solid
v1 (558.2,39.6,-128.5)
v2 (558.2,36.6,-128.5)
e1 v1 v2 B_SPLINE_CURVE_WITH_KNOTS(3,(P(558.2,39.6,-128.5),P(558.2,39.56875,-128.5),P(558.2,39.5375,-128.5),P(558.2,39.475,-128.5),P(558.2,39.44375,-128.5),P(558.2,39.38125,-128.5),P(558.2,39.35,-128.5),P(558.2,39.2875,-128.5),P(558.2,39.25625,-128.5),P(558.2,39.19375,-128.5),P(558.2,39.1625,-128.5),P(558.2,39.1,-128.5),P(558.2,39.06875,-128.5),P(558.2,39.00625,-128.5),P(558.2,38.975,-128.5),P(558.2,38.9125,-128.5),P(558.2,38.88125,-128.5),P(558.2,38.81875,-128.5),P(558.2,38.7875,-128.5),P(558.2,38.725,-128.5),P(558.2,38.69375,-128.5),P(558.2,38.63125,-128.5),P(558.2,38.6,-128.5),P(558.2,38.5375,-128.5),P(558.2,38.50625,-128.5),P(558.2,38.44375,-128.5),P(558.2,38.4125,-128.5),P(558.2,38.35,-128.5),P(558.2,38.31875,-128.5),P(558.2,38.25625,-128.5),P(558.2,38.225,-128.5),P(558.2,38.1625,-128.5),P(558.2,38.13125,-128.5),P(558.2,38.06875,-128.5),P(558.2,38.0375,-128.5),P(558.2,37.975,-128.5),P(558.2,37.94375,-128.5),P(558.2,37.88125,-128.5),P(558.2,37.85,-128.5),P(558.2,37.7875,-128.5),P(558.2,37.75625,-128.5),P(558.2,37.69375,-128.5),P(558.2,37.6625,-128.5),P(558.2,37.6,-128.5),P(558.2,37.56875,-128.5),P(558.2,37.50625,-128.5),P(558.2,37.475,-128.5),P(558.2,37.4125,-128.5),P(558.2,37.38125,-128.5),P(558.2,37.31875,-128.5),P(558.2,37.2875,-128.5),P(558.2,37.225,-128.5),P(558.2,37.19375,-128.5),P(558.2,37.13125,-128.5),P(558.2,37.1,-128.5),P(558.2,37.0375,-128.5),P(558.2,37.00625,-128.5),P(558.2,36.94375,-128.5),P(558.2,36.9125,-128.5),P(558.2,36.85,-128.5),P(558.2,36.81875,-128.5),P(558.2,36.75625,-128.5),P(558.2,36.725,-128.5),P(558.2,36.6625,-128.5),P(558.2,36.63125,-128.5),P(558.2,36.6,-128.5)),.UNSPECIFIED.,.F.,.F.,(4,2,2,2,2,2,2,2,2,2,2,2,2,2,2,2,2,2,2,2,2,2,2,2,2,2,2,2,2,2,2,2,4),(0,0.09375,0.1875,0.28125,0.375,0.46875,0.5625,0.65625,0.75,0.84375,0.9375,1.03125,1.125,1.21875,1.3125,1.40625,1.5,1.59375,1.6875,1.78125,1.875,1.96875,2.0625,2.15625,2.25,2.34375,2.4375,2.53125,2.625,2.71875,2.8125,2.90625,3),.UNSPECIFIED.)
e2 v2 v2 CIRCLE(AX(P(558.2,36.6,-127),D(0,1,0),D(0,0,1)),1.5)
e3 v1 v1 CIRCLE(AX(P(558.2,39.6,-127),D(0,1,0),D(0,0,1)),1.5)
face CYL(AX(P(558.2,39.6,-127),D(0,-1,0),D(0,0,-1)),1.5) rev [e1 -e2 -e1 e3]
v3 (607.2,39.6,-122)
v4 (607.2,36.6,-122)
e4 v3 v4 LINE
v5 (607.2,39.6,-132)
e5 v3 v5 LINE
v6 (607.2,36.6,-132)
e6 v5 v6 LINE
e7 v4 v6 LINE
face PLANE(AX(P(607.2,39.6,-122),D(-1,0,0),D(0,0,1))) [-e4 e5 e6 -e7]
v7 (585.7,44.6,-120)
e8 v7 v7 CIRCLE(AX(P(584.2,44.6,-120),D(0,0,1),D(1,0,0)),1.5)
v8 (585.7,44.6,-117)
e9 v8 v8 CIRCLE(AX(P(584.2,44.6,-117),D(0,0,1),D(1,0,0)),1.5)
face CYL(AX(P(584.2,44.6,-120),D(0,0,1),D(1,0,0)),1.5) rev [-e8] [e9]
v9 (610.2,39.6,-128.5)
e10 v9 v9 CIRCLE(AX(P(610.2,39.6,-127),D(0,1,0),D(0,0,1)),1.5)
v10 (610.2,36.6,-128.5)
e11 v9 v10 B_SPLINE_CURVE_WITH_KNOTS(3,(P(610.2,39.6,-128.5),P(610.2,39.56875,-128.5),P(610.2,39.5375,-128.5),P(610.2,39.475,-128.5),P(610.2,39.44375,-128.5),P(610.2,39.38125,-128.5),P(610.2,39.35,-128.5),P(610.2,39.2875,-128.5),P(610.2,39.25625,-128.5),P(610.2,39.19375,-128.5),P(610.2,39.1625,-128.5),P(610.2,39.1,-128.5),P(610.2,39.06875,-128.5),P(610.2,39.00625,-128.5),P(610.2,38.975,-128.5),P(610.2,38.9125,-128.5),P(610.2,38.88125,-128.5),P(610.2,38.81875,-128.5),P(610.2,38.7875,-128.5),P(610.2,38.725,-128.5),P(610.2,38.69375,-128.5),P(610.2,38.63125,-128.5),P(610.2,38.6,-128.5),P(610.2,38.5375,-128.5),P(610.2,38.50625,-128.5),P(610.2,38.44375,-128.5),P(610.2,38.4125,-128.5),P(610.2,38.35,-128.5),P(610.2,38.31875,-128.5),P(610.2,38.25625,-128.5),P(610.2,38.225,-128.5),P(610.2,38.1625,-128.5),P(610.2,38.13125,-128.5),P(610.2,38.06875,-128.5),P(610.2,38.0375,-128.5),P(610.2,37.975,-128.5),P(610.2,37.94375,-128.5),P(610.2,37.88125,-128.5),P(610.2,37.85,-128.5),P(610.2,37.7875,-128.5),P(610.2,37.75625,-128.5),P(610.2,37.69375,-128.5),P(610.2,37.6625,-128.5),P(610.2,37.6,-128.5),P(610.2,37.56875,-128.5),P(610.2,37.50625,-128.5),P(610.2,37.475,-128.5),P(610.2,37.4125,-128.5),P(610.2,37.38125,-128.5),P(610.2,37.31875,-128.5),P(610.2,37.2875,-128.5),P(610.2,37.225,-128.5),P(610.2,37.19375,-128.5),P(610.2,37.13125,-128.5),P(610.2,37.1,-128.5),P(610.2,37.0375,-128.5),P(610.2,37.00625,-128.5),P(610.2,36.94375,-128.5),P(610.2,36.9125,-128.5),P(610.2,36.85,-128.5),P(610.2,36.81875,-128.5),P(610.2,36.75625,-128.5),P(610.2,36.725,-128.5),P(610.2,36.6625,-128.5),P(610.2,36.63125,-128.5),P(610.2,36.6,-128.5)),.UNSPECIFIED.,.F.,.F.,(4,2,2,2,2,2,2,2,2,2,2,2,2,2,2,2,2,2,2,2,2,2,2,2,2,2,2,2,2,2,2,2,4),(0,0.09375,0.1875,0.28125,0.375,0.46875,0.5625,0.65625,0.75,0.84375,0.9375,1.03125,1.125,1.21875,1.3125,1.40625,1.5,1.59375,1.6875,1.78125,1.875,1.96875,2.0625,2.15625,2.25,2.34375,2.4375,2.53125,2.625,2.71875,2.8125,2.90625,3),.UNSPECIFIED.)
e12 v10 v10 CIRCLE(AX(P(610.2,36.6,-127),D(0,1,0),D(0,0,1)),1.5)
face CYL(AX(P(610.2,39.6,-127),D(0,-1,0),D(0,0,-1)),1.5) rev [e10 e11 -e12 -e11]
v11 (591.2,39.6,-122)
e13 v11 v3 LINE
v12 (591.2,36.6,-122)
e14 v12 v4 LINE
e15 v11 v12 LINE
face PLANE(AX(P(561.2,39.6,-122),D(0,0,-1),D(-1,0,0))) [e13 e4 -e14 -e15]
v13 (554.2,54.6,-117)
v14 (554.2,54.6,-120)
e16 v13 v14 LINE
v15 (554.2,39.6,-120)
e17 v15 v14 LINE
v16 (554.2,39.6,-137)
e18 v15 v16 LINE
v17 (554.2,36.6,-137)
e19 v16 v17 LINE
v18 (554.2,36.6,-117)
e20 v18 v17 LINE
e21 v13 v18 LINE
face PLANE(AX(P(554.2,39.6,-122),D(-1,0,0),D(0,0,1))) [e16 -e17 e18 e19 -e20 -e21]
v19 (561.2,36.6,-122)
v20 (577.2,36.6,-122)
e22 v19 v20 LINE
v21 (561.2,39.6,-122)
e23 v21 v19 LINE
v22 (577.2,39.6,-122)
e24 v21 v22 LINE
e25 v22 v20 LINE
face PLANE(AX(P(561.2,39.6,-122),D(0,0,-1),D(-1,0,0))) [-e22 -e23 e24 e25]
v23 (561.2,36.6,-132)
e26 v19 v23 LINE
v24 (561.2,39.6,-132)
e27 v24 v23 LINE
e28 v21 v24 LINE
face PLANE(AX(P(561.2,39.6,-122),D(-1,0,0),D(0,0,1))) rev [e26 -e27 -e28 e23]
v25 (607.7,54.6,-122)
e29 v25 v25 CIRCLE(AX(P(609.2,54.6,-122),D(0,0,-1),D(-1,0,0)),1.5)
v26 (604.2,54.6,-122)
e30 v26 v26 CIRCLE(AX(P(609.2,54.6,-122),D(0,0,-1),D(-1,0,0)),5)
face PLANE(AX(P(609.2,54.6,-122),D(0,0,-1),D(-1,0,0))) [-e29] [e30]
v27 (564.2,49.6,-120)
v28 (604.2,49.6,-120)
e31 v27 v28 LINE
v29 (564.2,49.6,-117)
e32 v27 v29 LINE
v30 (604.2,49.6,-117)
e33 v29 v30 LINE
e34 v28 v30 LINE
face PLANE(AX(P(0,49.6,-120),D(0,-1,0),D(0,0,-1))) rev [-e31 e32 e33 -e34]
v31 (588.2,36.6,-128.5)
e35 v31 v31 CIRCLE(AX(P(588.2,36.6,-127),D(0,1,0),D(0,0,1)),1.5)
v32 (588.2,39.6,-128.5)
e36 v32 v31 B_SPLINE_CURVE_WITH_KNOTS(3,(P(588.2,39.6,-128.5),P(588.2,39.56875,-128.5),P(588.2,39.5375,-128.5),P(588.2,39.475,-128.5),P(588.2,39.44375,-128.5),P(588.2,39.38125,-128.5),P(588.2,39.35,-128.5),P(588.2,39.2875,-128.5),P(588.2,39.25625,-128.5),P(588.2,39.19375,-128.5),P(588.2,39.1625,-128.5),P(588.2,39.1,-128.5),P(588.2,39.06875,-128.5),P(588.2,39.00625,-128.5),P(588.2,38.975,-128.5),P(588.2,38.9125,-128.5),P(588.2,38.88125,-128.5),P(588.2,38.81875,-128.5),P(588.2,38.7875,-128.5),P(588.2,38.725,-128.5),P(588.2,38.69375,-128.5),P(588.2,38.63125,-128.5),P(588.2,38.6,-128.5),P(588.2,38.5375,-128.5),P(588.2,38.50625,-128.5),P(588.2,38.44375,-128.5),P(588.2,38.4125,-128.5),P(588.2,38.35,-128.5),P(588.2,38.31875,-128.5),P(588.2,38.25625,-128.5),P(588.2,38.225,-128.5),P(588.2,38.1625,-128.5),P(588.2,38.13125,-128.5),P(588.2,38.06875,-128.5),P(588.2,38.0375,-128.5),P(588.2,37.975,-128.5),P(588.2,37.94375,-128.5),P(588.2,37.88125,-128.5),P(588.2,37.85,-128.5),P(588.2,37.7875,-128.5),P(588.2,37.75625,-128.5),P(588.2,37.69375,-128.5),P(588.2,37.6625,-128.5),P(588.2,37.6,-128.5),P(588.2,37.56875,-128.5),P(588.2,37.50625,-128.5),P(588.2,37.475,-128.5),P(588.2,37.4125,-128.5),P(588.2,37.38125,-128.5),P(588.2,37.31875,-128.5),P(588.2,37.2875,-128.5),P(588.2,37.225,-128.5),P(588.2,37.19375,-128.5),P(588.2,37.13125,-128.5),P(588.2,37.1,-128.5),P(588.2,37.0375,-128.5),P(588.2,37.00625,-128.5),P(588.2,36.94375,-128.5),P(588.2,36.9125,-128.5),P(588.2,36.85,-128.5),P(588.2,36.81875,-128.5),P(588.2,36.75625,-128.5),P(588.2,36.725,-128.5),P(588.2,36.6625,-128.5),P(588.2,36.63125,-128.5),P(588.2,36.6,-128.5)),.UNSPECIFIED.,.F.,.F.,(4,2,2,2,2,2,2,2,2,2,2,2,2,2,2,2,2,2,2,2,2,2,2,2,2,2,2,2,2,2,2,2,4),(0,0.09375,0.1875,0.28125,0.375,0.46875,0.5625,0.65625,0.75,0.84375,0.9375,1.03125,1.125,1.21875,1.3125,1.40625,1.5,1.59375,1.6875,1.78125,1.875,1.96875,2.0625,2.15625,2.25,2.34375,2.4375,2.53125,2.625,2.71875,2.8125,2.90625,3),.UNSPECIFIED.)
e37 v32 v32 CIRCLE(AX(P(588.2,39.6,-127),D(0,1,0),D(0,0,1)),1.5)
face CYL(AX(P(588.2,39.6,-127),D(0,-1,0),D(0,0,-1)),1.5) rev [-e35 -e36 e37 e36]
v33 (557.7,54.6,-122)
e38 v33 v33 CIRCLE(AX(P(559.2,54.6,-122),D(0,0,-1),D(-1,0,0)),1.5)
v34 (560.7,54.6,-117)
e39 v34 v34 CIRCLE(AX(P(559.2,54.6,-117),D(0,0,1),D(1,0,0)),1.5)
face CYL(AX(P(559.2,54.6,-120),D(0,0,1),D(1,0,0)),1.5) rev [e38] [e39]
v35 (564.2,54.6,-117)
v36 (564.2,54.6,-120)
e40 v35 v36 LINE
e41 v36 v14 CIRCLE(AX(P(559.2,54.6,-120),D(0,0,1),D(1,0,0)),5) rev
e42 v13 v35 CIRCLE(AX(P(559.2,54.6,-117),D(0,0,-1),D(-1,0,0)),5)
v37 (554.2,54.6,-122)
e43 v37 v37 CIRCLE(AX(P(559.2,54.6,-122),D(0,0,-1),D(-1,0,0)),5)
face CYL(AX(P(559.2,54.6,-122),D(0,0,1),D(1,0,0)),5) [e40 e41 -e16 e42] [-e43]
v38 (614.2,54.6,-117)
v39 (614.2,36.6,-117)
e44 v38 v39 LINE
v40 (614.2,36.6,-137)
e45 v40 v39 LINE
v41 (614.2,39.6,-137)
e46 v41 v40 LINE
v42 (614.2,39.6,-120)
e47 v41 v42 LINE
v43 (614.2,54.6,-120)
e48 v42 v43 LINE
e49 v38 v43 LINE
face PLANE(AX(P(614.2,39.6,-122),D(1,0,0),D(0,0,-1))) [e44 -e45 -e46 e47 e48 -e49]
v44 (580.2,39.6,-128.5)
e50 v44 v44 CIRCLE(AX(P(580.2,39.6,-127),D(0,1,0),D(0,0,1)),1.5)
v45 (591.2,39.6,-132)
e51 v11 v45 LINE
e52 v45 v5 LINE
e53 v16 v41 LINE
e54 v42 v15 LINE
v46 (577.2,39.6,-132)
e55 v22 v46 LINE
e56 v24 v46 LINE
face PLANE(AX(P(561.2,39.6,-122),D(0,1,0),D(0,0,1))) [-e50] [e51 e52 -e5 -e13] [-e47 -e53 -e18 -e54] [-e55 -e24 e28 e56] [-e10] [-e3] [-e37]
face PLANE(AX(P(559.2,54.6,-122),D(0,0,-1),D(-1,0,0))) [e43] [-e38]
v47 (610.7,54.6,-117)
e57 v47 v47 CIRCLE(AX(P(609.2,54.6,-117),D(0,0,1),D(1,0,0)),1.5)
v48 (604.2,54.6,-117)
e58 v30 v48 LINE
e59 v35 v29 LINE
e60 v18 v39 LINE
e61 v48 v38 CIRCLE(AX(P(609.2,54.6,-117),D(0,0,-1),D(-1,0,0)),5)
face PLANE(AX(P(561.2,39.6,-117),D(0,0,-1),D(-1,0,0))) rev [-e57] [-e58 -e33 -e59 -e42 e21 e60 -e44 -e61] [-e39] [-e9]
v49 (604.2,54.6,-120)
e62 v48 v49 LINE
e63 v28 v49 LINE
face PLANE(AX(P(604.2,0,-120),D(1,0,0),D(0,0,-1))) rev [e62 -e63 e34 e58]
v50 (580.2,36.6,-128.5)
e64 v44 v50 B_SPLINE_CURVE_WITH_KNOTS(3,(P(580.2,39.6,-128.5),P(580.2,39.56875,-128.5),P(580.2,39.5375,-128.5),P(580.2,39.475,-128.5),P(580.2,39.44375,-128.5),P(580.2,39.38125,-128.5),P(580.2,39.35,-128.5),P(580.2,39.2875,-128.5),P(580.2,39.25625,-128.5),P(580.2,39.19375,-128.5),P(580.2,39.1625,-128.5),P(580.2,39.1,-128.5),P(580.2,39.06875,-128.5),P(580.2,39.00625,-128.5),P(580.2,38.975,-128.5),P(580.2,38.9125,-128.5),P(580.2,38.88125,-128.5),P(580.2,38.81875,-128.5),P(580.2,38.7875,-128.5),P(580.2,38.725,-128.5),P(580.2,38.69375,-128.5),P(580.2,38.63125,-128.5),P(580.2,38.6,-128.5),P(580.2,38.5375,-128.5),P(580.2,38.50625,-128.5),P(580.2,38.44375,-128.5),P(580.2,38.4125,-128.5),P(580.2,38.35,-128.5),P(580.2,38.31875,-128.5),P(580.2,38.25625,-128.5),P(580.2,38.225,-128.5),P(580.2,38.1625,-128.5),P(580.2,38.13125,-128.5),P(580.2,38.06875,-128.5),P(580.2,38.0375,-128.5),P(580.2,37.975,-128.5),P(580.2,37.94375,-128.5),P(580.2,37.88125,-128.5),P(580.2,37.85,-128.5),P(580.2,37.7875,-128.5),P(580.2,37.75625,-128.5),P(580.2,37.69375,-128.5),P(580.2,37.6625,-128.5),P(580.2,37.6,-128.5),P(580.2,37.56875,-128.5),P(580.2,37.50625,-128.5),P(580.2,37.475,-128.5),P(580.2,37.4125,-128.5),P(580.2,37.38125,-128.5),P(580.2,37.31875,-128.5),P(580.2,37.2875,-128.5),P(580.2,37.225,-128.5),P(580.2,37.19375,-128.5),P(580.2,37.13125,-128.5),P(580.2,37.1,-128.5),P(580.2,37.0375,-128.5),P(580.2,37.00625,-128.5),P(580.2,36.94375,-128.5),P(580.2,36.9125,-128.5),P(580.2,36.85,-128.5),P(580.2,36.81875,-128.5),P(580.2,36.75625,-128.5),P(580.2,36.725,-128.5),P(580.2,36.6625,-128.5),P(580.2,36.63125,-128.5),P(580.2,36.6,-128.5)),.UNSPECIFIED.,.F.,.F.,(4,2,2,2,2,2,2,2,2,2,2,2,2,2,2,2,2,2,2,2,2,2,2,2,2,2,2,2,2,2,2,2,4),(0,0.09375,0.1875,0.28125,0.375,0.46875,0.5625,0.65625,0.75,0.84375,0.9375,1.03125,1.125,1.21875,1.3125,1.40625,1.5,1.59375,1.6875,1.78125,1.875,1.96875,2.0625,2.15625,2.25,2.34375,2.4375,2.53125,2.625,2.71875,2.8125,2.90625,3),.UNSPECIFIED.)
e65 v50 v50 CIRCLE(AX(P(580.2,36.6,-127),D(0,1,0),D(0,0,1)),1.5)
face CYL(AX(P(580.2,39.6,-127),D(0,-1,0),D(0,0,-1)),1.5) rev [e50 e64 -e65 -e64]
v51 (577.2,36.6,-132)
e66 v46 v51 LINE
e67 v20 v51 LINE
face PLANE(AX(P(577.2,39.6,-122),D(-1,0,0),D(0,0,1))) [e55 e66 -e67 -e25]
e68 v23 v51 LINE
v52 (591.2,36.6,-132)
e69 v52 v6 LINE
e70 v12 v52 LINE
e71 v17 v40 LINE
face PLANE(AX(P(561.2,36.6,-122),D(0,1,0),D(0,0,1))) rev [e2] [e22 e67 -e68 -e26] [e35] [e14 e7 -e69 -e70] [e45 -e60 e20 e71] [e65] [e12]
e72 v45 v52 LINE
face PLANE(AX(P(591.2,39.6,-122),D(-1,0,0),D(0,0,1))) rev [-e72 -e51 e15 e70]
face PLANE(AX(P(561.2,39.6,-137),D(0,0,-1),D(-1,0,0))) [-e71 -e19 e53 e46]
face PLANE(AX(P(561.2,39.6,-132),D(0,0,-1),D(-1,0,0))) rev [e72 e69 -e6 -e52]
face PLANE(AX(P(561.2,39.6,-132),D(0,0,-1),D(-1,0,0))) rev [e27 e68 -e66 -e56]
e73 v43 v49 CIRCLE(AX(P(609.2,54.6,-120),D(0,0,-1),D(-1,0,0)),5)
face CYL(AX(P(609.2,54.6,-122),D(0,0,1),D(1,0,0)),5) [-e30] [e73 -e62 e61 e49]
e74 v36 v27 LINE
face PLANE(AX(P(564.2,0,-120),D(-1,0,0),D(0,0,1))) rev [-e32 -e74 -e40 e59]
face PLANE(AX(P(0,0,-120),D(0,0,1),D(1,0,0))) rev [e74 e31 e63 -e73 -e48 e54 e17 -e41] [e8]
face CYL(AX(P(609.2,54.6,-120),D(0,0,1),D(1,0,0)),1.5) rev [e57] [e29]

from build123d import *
from build123d.topology import SkipClean

# Parameters (mm, degrees)
SKETCH1_W           = 1524
SKETCH1_H           = 508
SKETCH1_W_2         = 406.4
SKETCH1_H_2         = 254
SKETCH1_R           = 38.1
BOSS_EXTRUDE2_DEPTH = 76.2
SCALE2_SCALE        = 0.039370079
SKETCH3_R           = 1.5
BOSS_EXTRUDE3_DEPTH = 3
SKETCH4_R           = 5
SKETCH4_R_2         = 1.5
BOSS_EXTRUDE5_DEPTH = 2
CUT_EXTRUDE1_START  = -29
CUT_EXTRUDE1_DEPTH  = 29


with BuildPart() as part:
    # Sketch1 → Boss-Extrude2 (new body)
    with BuildSketch(Plane(origin=(0, 0, 0), x_dir=(1, 0, 0), z_dir=(0, 1, 0))):
        with Locations((584.2, 127)):
            Rectangle(SKETCH1_W, SKETCH1_H)
        with Locations((203.2, 127)):
            Rectangle(SKETCH1_W_2, SKETCH1_H_2, mode=Mode.SUBTRACT)
        with Locations((482.6, 127)):
            Circle(SKETCH1_R, mode=Mode.SUBTRACT)
        with Locations((685.8, 127)):
            Circle(SKETCH1_R, mode=Mode.SUBTRACT)
        with Locations((965.2, 127)):
            Rectangle(SKETCH1_W_2, SKETCH1_H_2, mode=Mode.SUBTRACT)
        with Locations((1244.6, 127)):
            Circle(SKETCH1_R, mode=Mode.SUBTRACT)
        with Locations((-76.2, 127)):
            Circle(SKETCH1_R, mode=Mode.SUBTRACT)
    extrude(amount=BOSS_EXTRUDE2_DEPTH)


with BuildPart() as part_1:
    # Scale2: scaled about (584.2, 38.1, -127)
    add(part.part.scale(SCALE2_SCALE).moved(Location((561.2, 36.6, -122))))

    # Sketch3 → Boss-Extrude3 (add)
    with BuildSketch(Plane.XY.offset(-117)):
        Polygon((604.2, 49.6), (564.2, 49.6), (564.2, 59.6), (559.2, 59.6), (554.2, 59.6), (554.2, 39.6), (584.2, 39.6), (614.2, 39.6), (614.2, 59.6), (609.2, 59.6), (604.2, 59.6), align=None)
        with Locations((584.2, 44.6)):
            Circle(SKETCH3_R, mode=Mode.SUBTRACT)
        with Locations((559.2, 54.6)):
            Circle(SKETCH3_R, mode=Mode.SUBTRACT)
        with Locations((609.2, 54.6)):
            Circle(SKETCH3_R, mode=Mode.SUBTRACT)
    extrude(amount=-BOSS_EXTRUDE3_DEPTH)

    # Sketch4 → Boss-Extrude5 (add)
    # profile 1 of 2: a face of its own
    with SkipClean():  # the faces are left unmerged after this step: merging them gives an invalid solid
        with BuildSketch(Plane(origin=(0, 0, -120), x_dir=(-1, 0, 0), z_dir=(0, 0, -1))):
            with Locations((-559.2, 54.6)):
                Circle(SKETCH4_R)
            with Locations((-559.2, 54.6)):
                Circle(SKETCH4_R_2, mode=Mode.SUBTRACT)
        # profile 2 of 2: a face of its own
        with BuildSketch(Plane(origin=(0, 0, -120), x_dir=(-1, 0, 0), z_dir=(0, 0, -1))):
            with Locations((-609.2, 54.6)):
                Circle(SKETCH4_R)
            with Locations((-609.2, 54.6)):
                Circle(SKETCH4_R_2, mode=Mode.SUBTRACT)
        extrude(amount=BOSS_EXTRUDE5_DEPTH)
    add(part_1.part.scale(1), mode=Mode.REPLACE)  # the faces are merged on a copy

    # Sketch5 → Cut-Extrude1 (cut)
    with BuildSketch(Plane(origin=(0, 0, -122), x_dir=(-1, 0, 0), z_dir=(0, 0, -1)).offset(CUT_EXTRUDE1_START)):
        with BuildLine():
            ThreePointArc((-614.2, 54.6), (-612.735533906, 58.135533906), (-609.2, 59.6))
            Line((-609.2, 59.6), (-614.2, 59.6))
            Line((-614.2, 59.6), (-614.2, 54.6))
        make_face()
        with BuildLine():
            Line((-604.2, 59.6), (-609.2, 59.6))
            ThreePointArc((-609.2, 59.6), (-605.664466094, 58.135533906), (-604.2, 54.6))
            Line((-604.2, 54.6), (-604.2, 59.6))
        make_face()
        with BuildLine():
            ThreePointArc((-564.2, 54.6), (-562.735533906, 58.135533906), (-559.2, 59.6))
            Line((-559.2, 59.6), (-564.2, 59.6))
            Line((-564.2, 59.6), (-564.2, 54.6))
        make_face()
        with BuildLine():
            Line((-554.2, 59.6), (-559.2, 59.6))
            ThreePointArc((-559.2, 59.6), (-555.664466094, 58.135533906), (-554.2, 54.6))
            Line((-554.2, 54.6), (-554.2, 59.6))
        make_face()
    extrude(amount=CUT_EXTRUDE1_DEPTH, mode=Mode.SUBTRACT)


solid = part_1.part
